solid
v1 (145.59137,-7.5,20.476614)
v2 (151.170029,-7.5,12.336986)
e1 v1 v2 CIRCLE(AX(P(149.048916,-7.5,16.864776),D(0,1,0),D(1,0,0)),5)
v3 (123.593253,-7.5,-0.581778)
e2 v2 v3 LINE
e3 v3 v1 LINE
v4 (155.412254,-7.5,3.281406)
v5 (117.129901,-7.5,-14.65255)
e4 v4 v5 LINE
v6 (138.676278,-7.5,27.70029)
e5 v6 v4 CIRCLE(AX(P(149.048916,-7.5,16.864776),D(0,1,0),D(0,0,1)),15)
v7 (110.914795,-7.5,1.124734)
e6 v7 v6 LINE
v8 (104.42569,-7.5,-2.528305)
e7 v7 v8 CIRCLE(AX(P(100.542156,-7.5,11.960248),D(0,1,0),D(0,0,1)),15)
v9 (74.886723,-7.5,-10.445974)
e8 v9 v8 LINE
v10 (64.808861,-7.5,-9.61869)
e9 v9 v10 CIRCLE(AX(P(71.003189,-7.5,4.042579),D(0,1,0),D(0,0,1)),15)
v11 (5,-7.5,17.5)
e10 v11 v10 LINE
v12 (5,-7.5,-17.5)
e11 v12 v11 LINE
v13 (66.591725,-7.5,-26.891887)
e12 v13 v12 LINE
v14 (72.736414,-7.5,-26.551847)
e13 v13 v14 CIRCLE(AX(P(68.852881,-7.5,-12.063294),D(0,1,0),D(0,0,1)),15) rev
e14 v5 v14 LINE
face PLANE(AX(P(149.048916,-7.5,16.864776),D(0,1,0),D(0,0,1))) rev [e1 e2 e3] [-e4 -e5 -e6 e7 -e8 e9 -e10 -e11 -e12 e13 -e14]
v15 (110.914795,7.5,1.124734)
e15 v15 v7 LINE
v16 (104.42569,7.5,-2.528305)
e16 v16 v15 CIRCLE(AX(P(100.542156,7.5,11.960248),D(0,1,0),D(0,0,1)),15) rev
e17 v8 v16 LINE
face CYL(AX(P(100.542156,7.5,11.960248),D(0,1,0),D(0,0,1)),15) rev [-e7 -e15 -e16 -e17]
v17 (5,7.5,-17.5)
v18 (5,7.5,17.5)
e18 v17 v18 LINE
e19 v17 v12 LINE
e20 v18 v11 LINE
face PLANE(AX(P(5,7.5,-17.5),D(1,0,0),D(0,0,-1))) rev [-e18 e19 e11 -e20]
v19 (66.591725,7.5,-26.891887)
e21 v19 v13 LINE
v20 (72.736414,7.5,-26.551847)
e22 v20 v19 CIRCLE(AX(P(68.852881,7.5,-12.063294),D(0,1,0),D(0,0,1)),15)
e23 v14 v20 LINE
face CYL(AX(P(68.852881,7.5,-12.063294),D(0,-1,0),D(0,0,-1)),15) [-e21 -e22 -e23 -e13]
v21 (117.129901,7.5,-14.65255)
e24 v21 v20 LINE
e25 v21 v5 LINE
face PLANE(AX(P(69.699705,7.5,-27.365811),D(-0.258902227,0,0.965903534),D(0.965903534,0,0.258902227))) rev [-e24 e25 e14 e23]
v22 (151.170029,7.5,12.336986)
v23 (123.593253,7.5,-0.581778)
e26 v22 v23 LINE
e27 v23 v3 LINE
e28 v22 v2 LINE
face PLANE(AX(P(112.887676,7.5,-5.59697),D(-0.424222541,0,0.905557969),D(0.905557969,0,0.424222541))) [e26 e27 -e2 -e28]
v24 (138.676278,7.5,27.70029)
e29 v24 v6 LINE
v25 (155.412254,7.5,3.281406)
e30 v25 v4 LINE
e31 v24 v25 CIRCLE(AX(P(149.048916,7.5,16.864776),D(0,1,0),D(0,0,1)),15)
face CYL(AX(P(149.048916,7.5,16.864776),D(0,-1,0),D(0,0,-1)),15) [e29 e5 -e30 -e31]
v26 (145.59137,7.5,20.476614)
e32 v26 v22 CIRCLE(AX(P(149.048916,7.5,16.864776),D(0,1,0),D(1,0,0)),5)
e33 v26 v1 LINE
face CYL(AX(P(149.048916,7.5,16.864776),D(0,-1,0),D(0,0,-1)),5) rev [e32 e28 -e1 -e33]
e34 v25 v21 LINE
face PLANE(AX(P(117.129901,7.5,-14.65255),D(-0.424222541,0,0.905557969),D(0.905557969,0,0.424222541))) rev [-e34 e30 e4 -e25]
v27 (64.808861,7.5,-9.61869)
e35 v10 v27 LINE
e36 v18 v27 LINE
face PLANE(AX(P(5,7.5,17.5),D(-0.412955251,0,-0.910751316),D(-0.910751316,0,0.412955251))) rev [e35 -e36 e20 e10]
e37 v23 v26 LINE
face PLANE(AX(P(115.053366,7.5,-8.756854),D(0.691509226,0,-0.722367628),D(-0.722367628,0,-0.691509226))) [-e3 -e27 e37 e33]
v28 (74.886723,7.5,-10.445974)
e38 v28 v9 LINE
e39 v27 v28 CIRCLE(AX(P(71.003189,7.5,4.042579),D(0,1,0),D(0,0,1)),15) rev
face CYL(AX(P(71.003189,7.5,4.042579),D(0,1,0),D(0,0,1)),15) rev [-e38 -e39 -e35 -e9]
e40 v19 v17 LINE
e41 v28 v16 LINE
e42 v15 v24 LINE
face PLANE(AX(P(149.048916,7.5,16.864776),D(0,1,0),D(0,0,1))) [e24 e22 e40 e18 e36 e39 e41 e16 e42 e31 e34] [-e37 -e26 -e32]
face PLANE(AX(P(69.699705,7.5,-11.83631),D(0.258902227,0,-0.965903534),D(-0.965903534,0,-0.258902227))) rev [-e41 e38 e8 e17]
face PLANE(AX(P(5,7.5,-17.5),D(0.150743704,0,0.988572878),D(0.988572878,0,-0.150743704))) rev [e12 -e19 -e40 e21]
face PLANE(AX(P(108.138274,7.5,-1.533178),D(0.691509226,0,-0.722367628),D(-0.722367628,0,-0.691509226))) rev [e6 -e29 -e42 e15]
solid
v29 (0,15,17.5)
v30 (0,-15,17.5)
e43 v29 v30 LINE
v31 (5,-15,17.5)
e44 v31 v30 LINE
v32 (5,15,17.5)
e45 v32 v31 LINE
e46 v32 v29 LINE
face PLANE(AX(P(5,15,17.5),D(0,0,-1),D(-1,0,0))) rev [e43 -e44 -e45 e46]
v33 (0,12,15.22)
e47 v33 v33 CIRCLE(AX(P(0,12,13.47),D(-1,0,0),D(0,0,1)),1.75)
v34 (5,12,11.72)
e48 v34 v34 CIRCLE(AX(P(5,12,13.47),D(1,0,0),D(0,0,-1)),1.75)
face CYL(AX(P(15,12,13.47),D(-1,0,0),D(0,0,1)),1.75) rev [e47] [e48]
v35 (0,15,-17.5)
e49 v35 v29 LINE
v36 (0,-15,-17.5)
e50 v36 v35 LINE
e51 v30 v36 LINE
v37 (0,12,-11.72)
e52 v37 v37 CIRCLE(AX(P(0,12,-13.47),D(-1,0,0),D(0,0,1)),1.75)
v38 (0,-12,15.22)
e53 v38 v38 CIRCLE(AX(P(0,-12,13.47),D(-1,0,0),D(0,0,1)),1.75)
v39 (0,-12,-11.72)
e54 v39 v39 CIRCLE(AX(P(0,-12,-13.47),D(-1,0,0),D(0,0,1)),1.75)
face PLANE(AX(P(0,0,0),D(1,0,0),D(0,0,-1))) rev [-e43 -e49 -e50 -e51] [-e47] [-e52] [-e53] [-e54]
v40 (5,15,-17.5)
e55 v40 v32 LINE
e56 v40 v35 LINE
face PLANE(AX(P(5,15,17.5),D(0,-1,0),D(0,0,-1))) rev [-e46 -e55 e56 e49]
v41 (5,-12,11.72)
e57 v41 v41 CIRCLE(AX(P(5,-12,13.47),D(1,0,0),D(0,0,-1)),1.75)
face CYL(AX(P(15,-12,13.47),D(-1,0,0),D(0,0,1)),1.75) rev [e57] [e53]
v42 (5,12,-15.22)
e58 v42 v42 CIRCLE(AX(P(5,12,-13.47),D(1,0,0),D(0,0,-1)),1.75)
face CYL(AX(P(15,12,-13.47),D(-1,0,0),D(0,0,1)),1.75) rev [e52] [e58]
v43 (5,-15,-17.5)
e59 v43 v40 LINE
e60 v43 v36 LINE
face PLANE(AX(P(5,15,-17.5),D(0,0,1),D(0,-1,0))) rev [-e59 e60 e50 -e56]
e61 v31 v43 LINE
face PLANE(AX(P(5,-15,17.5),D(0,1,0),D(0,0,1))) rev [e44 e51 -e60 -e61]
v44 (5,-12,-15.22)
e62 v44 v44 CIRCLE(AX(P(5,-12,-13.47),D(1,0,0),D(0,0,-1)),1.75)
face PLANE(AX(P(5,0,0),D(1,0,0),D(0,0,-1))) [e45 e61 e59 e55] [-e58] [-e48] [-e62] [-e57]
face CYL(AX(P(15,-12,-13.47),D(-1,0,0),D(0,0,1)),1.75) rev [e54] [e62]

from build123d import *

# Parameters (mm, degrees)
SKETCH1_W           = 35
SKETCH1_H           = 30
BOSS_EXTRUDE1_DEPTH = 5
EXTRUDE_THIN1_START = -7.5
EXTRUDE_THIN1_DEPTH = 15
FILLET1_R           = 15
SKETCH3_R           = 1.75
CUT_EXTRUDE1_DEPTH  = 15


# Read off the part's stored shape, not the designer's step: Extrude-Thin1
with BuildPart() as part:
    # Sketch1 → Boss-Extrude1 (new body)
    with BuildSketch(Plane(origin=(0, 0, 0), x_dir=(0, 0, -1), z_dir=(1, 0, 0))):
        Rectangle(SKETCH1_W, SKETCH1_H)
    extrude(amount=BOSS_EXTRUDE1_DEPTH)

    # Sketch3 → Cut-Extrude1 (cut)
    with BuildSketch(Plane.ZY):
        with Locations((-13.47, 12)):
            Circle(SKETCH3_R)
        with Locations((-13.47, -12)):
            Circle(SKETCH3_R)
        with Locations((13.47, -12)):
            Circle(SKETCH3_R)
        with Locations((13.47, 12)):
            Circle(SKETCH3_R)
    extrude(amount=-CUT_EXTRUDE1_DEPTH, mode=Mode.SUBTRACT)


with BuildPart() as body_2:
    # Extrude-Thin1 outline → Extrude-Thin1 (new body)
    with BuildSketch(Plane(origin=(0, 0, 0), x_dir=(1, 0, 0), z_dir=(0, 1, 0)).offset(EXTRUDE_THIN1_START)):
        with BuildLine():
            Line((5, 17.5), (5, -17.5))
            Line((5, -17.5), (69.699704629, 11.836309819))
            Line((69.699704629, 11.836309819), (108.138274173, 1.533178197))
            Line((108.138274173, 1.533178197), (138.676277548, -27.700290017))
            ThreePointArc((138.676277548, -27.700290017), (161.421833774, -25.344805337), (155.412254056, -3.281406058))
            Line((155.412254056, -3.281406058), (117.129901337, 14.652550121))
            Line((117.129901337, 14.652550121), (69.699704629, 27.365810926))
            Line((69.699704629, 27.365810926), (5, 17.5))
        make_face()
        with BuildLine():
            ThreePointArc((151.170028648, -12.336985752), (153.173221887, -19.691452178), (145.591369812, -20.476613738))
            Line((145.591369812, -20.476613738), (123.593252888, 0.581778455))
            Line((123.593252888, 0.581778455), (151.170028648, -12.336985752))
        make_face(mode=Mode.SUBTRACT)
    extrude(amount=EXTRUDE_THIN1_DEPTH)

    # Fillet1
    fillet1_edges = [body_2.edges().sort_by_distance(p)[0] for p in [
        (69.699704629, 0, -27.365810926),
        (108.138274173, 0, -1.533178197),
        (69.699704629, 0, -11.836309819),
    ]]
    fillet(fillet1_edges, radius=FILLET1_R)


solid = Compound([part.part, body_2.part])
